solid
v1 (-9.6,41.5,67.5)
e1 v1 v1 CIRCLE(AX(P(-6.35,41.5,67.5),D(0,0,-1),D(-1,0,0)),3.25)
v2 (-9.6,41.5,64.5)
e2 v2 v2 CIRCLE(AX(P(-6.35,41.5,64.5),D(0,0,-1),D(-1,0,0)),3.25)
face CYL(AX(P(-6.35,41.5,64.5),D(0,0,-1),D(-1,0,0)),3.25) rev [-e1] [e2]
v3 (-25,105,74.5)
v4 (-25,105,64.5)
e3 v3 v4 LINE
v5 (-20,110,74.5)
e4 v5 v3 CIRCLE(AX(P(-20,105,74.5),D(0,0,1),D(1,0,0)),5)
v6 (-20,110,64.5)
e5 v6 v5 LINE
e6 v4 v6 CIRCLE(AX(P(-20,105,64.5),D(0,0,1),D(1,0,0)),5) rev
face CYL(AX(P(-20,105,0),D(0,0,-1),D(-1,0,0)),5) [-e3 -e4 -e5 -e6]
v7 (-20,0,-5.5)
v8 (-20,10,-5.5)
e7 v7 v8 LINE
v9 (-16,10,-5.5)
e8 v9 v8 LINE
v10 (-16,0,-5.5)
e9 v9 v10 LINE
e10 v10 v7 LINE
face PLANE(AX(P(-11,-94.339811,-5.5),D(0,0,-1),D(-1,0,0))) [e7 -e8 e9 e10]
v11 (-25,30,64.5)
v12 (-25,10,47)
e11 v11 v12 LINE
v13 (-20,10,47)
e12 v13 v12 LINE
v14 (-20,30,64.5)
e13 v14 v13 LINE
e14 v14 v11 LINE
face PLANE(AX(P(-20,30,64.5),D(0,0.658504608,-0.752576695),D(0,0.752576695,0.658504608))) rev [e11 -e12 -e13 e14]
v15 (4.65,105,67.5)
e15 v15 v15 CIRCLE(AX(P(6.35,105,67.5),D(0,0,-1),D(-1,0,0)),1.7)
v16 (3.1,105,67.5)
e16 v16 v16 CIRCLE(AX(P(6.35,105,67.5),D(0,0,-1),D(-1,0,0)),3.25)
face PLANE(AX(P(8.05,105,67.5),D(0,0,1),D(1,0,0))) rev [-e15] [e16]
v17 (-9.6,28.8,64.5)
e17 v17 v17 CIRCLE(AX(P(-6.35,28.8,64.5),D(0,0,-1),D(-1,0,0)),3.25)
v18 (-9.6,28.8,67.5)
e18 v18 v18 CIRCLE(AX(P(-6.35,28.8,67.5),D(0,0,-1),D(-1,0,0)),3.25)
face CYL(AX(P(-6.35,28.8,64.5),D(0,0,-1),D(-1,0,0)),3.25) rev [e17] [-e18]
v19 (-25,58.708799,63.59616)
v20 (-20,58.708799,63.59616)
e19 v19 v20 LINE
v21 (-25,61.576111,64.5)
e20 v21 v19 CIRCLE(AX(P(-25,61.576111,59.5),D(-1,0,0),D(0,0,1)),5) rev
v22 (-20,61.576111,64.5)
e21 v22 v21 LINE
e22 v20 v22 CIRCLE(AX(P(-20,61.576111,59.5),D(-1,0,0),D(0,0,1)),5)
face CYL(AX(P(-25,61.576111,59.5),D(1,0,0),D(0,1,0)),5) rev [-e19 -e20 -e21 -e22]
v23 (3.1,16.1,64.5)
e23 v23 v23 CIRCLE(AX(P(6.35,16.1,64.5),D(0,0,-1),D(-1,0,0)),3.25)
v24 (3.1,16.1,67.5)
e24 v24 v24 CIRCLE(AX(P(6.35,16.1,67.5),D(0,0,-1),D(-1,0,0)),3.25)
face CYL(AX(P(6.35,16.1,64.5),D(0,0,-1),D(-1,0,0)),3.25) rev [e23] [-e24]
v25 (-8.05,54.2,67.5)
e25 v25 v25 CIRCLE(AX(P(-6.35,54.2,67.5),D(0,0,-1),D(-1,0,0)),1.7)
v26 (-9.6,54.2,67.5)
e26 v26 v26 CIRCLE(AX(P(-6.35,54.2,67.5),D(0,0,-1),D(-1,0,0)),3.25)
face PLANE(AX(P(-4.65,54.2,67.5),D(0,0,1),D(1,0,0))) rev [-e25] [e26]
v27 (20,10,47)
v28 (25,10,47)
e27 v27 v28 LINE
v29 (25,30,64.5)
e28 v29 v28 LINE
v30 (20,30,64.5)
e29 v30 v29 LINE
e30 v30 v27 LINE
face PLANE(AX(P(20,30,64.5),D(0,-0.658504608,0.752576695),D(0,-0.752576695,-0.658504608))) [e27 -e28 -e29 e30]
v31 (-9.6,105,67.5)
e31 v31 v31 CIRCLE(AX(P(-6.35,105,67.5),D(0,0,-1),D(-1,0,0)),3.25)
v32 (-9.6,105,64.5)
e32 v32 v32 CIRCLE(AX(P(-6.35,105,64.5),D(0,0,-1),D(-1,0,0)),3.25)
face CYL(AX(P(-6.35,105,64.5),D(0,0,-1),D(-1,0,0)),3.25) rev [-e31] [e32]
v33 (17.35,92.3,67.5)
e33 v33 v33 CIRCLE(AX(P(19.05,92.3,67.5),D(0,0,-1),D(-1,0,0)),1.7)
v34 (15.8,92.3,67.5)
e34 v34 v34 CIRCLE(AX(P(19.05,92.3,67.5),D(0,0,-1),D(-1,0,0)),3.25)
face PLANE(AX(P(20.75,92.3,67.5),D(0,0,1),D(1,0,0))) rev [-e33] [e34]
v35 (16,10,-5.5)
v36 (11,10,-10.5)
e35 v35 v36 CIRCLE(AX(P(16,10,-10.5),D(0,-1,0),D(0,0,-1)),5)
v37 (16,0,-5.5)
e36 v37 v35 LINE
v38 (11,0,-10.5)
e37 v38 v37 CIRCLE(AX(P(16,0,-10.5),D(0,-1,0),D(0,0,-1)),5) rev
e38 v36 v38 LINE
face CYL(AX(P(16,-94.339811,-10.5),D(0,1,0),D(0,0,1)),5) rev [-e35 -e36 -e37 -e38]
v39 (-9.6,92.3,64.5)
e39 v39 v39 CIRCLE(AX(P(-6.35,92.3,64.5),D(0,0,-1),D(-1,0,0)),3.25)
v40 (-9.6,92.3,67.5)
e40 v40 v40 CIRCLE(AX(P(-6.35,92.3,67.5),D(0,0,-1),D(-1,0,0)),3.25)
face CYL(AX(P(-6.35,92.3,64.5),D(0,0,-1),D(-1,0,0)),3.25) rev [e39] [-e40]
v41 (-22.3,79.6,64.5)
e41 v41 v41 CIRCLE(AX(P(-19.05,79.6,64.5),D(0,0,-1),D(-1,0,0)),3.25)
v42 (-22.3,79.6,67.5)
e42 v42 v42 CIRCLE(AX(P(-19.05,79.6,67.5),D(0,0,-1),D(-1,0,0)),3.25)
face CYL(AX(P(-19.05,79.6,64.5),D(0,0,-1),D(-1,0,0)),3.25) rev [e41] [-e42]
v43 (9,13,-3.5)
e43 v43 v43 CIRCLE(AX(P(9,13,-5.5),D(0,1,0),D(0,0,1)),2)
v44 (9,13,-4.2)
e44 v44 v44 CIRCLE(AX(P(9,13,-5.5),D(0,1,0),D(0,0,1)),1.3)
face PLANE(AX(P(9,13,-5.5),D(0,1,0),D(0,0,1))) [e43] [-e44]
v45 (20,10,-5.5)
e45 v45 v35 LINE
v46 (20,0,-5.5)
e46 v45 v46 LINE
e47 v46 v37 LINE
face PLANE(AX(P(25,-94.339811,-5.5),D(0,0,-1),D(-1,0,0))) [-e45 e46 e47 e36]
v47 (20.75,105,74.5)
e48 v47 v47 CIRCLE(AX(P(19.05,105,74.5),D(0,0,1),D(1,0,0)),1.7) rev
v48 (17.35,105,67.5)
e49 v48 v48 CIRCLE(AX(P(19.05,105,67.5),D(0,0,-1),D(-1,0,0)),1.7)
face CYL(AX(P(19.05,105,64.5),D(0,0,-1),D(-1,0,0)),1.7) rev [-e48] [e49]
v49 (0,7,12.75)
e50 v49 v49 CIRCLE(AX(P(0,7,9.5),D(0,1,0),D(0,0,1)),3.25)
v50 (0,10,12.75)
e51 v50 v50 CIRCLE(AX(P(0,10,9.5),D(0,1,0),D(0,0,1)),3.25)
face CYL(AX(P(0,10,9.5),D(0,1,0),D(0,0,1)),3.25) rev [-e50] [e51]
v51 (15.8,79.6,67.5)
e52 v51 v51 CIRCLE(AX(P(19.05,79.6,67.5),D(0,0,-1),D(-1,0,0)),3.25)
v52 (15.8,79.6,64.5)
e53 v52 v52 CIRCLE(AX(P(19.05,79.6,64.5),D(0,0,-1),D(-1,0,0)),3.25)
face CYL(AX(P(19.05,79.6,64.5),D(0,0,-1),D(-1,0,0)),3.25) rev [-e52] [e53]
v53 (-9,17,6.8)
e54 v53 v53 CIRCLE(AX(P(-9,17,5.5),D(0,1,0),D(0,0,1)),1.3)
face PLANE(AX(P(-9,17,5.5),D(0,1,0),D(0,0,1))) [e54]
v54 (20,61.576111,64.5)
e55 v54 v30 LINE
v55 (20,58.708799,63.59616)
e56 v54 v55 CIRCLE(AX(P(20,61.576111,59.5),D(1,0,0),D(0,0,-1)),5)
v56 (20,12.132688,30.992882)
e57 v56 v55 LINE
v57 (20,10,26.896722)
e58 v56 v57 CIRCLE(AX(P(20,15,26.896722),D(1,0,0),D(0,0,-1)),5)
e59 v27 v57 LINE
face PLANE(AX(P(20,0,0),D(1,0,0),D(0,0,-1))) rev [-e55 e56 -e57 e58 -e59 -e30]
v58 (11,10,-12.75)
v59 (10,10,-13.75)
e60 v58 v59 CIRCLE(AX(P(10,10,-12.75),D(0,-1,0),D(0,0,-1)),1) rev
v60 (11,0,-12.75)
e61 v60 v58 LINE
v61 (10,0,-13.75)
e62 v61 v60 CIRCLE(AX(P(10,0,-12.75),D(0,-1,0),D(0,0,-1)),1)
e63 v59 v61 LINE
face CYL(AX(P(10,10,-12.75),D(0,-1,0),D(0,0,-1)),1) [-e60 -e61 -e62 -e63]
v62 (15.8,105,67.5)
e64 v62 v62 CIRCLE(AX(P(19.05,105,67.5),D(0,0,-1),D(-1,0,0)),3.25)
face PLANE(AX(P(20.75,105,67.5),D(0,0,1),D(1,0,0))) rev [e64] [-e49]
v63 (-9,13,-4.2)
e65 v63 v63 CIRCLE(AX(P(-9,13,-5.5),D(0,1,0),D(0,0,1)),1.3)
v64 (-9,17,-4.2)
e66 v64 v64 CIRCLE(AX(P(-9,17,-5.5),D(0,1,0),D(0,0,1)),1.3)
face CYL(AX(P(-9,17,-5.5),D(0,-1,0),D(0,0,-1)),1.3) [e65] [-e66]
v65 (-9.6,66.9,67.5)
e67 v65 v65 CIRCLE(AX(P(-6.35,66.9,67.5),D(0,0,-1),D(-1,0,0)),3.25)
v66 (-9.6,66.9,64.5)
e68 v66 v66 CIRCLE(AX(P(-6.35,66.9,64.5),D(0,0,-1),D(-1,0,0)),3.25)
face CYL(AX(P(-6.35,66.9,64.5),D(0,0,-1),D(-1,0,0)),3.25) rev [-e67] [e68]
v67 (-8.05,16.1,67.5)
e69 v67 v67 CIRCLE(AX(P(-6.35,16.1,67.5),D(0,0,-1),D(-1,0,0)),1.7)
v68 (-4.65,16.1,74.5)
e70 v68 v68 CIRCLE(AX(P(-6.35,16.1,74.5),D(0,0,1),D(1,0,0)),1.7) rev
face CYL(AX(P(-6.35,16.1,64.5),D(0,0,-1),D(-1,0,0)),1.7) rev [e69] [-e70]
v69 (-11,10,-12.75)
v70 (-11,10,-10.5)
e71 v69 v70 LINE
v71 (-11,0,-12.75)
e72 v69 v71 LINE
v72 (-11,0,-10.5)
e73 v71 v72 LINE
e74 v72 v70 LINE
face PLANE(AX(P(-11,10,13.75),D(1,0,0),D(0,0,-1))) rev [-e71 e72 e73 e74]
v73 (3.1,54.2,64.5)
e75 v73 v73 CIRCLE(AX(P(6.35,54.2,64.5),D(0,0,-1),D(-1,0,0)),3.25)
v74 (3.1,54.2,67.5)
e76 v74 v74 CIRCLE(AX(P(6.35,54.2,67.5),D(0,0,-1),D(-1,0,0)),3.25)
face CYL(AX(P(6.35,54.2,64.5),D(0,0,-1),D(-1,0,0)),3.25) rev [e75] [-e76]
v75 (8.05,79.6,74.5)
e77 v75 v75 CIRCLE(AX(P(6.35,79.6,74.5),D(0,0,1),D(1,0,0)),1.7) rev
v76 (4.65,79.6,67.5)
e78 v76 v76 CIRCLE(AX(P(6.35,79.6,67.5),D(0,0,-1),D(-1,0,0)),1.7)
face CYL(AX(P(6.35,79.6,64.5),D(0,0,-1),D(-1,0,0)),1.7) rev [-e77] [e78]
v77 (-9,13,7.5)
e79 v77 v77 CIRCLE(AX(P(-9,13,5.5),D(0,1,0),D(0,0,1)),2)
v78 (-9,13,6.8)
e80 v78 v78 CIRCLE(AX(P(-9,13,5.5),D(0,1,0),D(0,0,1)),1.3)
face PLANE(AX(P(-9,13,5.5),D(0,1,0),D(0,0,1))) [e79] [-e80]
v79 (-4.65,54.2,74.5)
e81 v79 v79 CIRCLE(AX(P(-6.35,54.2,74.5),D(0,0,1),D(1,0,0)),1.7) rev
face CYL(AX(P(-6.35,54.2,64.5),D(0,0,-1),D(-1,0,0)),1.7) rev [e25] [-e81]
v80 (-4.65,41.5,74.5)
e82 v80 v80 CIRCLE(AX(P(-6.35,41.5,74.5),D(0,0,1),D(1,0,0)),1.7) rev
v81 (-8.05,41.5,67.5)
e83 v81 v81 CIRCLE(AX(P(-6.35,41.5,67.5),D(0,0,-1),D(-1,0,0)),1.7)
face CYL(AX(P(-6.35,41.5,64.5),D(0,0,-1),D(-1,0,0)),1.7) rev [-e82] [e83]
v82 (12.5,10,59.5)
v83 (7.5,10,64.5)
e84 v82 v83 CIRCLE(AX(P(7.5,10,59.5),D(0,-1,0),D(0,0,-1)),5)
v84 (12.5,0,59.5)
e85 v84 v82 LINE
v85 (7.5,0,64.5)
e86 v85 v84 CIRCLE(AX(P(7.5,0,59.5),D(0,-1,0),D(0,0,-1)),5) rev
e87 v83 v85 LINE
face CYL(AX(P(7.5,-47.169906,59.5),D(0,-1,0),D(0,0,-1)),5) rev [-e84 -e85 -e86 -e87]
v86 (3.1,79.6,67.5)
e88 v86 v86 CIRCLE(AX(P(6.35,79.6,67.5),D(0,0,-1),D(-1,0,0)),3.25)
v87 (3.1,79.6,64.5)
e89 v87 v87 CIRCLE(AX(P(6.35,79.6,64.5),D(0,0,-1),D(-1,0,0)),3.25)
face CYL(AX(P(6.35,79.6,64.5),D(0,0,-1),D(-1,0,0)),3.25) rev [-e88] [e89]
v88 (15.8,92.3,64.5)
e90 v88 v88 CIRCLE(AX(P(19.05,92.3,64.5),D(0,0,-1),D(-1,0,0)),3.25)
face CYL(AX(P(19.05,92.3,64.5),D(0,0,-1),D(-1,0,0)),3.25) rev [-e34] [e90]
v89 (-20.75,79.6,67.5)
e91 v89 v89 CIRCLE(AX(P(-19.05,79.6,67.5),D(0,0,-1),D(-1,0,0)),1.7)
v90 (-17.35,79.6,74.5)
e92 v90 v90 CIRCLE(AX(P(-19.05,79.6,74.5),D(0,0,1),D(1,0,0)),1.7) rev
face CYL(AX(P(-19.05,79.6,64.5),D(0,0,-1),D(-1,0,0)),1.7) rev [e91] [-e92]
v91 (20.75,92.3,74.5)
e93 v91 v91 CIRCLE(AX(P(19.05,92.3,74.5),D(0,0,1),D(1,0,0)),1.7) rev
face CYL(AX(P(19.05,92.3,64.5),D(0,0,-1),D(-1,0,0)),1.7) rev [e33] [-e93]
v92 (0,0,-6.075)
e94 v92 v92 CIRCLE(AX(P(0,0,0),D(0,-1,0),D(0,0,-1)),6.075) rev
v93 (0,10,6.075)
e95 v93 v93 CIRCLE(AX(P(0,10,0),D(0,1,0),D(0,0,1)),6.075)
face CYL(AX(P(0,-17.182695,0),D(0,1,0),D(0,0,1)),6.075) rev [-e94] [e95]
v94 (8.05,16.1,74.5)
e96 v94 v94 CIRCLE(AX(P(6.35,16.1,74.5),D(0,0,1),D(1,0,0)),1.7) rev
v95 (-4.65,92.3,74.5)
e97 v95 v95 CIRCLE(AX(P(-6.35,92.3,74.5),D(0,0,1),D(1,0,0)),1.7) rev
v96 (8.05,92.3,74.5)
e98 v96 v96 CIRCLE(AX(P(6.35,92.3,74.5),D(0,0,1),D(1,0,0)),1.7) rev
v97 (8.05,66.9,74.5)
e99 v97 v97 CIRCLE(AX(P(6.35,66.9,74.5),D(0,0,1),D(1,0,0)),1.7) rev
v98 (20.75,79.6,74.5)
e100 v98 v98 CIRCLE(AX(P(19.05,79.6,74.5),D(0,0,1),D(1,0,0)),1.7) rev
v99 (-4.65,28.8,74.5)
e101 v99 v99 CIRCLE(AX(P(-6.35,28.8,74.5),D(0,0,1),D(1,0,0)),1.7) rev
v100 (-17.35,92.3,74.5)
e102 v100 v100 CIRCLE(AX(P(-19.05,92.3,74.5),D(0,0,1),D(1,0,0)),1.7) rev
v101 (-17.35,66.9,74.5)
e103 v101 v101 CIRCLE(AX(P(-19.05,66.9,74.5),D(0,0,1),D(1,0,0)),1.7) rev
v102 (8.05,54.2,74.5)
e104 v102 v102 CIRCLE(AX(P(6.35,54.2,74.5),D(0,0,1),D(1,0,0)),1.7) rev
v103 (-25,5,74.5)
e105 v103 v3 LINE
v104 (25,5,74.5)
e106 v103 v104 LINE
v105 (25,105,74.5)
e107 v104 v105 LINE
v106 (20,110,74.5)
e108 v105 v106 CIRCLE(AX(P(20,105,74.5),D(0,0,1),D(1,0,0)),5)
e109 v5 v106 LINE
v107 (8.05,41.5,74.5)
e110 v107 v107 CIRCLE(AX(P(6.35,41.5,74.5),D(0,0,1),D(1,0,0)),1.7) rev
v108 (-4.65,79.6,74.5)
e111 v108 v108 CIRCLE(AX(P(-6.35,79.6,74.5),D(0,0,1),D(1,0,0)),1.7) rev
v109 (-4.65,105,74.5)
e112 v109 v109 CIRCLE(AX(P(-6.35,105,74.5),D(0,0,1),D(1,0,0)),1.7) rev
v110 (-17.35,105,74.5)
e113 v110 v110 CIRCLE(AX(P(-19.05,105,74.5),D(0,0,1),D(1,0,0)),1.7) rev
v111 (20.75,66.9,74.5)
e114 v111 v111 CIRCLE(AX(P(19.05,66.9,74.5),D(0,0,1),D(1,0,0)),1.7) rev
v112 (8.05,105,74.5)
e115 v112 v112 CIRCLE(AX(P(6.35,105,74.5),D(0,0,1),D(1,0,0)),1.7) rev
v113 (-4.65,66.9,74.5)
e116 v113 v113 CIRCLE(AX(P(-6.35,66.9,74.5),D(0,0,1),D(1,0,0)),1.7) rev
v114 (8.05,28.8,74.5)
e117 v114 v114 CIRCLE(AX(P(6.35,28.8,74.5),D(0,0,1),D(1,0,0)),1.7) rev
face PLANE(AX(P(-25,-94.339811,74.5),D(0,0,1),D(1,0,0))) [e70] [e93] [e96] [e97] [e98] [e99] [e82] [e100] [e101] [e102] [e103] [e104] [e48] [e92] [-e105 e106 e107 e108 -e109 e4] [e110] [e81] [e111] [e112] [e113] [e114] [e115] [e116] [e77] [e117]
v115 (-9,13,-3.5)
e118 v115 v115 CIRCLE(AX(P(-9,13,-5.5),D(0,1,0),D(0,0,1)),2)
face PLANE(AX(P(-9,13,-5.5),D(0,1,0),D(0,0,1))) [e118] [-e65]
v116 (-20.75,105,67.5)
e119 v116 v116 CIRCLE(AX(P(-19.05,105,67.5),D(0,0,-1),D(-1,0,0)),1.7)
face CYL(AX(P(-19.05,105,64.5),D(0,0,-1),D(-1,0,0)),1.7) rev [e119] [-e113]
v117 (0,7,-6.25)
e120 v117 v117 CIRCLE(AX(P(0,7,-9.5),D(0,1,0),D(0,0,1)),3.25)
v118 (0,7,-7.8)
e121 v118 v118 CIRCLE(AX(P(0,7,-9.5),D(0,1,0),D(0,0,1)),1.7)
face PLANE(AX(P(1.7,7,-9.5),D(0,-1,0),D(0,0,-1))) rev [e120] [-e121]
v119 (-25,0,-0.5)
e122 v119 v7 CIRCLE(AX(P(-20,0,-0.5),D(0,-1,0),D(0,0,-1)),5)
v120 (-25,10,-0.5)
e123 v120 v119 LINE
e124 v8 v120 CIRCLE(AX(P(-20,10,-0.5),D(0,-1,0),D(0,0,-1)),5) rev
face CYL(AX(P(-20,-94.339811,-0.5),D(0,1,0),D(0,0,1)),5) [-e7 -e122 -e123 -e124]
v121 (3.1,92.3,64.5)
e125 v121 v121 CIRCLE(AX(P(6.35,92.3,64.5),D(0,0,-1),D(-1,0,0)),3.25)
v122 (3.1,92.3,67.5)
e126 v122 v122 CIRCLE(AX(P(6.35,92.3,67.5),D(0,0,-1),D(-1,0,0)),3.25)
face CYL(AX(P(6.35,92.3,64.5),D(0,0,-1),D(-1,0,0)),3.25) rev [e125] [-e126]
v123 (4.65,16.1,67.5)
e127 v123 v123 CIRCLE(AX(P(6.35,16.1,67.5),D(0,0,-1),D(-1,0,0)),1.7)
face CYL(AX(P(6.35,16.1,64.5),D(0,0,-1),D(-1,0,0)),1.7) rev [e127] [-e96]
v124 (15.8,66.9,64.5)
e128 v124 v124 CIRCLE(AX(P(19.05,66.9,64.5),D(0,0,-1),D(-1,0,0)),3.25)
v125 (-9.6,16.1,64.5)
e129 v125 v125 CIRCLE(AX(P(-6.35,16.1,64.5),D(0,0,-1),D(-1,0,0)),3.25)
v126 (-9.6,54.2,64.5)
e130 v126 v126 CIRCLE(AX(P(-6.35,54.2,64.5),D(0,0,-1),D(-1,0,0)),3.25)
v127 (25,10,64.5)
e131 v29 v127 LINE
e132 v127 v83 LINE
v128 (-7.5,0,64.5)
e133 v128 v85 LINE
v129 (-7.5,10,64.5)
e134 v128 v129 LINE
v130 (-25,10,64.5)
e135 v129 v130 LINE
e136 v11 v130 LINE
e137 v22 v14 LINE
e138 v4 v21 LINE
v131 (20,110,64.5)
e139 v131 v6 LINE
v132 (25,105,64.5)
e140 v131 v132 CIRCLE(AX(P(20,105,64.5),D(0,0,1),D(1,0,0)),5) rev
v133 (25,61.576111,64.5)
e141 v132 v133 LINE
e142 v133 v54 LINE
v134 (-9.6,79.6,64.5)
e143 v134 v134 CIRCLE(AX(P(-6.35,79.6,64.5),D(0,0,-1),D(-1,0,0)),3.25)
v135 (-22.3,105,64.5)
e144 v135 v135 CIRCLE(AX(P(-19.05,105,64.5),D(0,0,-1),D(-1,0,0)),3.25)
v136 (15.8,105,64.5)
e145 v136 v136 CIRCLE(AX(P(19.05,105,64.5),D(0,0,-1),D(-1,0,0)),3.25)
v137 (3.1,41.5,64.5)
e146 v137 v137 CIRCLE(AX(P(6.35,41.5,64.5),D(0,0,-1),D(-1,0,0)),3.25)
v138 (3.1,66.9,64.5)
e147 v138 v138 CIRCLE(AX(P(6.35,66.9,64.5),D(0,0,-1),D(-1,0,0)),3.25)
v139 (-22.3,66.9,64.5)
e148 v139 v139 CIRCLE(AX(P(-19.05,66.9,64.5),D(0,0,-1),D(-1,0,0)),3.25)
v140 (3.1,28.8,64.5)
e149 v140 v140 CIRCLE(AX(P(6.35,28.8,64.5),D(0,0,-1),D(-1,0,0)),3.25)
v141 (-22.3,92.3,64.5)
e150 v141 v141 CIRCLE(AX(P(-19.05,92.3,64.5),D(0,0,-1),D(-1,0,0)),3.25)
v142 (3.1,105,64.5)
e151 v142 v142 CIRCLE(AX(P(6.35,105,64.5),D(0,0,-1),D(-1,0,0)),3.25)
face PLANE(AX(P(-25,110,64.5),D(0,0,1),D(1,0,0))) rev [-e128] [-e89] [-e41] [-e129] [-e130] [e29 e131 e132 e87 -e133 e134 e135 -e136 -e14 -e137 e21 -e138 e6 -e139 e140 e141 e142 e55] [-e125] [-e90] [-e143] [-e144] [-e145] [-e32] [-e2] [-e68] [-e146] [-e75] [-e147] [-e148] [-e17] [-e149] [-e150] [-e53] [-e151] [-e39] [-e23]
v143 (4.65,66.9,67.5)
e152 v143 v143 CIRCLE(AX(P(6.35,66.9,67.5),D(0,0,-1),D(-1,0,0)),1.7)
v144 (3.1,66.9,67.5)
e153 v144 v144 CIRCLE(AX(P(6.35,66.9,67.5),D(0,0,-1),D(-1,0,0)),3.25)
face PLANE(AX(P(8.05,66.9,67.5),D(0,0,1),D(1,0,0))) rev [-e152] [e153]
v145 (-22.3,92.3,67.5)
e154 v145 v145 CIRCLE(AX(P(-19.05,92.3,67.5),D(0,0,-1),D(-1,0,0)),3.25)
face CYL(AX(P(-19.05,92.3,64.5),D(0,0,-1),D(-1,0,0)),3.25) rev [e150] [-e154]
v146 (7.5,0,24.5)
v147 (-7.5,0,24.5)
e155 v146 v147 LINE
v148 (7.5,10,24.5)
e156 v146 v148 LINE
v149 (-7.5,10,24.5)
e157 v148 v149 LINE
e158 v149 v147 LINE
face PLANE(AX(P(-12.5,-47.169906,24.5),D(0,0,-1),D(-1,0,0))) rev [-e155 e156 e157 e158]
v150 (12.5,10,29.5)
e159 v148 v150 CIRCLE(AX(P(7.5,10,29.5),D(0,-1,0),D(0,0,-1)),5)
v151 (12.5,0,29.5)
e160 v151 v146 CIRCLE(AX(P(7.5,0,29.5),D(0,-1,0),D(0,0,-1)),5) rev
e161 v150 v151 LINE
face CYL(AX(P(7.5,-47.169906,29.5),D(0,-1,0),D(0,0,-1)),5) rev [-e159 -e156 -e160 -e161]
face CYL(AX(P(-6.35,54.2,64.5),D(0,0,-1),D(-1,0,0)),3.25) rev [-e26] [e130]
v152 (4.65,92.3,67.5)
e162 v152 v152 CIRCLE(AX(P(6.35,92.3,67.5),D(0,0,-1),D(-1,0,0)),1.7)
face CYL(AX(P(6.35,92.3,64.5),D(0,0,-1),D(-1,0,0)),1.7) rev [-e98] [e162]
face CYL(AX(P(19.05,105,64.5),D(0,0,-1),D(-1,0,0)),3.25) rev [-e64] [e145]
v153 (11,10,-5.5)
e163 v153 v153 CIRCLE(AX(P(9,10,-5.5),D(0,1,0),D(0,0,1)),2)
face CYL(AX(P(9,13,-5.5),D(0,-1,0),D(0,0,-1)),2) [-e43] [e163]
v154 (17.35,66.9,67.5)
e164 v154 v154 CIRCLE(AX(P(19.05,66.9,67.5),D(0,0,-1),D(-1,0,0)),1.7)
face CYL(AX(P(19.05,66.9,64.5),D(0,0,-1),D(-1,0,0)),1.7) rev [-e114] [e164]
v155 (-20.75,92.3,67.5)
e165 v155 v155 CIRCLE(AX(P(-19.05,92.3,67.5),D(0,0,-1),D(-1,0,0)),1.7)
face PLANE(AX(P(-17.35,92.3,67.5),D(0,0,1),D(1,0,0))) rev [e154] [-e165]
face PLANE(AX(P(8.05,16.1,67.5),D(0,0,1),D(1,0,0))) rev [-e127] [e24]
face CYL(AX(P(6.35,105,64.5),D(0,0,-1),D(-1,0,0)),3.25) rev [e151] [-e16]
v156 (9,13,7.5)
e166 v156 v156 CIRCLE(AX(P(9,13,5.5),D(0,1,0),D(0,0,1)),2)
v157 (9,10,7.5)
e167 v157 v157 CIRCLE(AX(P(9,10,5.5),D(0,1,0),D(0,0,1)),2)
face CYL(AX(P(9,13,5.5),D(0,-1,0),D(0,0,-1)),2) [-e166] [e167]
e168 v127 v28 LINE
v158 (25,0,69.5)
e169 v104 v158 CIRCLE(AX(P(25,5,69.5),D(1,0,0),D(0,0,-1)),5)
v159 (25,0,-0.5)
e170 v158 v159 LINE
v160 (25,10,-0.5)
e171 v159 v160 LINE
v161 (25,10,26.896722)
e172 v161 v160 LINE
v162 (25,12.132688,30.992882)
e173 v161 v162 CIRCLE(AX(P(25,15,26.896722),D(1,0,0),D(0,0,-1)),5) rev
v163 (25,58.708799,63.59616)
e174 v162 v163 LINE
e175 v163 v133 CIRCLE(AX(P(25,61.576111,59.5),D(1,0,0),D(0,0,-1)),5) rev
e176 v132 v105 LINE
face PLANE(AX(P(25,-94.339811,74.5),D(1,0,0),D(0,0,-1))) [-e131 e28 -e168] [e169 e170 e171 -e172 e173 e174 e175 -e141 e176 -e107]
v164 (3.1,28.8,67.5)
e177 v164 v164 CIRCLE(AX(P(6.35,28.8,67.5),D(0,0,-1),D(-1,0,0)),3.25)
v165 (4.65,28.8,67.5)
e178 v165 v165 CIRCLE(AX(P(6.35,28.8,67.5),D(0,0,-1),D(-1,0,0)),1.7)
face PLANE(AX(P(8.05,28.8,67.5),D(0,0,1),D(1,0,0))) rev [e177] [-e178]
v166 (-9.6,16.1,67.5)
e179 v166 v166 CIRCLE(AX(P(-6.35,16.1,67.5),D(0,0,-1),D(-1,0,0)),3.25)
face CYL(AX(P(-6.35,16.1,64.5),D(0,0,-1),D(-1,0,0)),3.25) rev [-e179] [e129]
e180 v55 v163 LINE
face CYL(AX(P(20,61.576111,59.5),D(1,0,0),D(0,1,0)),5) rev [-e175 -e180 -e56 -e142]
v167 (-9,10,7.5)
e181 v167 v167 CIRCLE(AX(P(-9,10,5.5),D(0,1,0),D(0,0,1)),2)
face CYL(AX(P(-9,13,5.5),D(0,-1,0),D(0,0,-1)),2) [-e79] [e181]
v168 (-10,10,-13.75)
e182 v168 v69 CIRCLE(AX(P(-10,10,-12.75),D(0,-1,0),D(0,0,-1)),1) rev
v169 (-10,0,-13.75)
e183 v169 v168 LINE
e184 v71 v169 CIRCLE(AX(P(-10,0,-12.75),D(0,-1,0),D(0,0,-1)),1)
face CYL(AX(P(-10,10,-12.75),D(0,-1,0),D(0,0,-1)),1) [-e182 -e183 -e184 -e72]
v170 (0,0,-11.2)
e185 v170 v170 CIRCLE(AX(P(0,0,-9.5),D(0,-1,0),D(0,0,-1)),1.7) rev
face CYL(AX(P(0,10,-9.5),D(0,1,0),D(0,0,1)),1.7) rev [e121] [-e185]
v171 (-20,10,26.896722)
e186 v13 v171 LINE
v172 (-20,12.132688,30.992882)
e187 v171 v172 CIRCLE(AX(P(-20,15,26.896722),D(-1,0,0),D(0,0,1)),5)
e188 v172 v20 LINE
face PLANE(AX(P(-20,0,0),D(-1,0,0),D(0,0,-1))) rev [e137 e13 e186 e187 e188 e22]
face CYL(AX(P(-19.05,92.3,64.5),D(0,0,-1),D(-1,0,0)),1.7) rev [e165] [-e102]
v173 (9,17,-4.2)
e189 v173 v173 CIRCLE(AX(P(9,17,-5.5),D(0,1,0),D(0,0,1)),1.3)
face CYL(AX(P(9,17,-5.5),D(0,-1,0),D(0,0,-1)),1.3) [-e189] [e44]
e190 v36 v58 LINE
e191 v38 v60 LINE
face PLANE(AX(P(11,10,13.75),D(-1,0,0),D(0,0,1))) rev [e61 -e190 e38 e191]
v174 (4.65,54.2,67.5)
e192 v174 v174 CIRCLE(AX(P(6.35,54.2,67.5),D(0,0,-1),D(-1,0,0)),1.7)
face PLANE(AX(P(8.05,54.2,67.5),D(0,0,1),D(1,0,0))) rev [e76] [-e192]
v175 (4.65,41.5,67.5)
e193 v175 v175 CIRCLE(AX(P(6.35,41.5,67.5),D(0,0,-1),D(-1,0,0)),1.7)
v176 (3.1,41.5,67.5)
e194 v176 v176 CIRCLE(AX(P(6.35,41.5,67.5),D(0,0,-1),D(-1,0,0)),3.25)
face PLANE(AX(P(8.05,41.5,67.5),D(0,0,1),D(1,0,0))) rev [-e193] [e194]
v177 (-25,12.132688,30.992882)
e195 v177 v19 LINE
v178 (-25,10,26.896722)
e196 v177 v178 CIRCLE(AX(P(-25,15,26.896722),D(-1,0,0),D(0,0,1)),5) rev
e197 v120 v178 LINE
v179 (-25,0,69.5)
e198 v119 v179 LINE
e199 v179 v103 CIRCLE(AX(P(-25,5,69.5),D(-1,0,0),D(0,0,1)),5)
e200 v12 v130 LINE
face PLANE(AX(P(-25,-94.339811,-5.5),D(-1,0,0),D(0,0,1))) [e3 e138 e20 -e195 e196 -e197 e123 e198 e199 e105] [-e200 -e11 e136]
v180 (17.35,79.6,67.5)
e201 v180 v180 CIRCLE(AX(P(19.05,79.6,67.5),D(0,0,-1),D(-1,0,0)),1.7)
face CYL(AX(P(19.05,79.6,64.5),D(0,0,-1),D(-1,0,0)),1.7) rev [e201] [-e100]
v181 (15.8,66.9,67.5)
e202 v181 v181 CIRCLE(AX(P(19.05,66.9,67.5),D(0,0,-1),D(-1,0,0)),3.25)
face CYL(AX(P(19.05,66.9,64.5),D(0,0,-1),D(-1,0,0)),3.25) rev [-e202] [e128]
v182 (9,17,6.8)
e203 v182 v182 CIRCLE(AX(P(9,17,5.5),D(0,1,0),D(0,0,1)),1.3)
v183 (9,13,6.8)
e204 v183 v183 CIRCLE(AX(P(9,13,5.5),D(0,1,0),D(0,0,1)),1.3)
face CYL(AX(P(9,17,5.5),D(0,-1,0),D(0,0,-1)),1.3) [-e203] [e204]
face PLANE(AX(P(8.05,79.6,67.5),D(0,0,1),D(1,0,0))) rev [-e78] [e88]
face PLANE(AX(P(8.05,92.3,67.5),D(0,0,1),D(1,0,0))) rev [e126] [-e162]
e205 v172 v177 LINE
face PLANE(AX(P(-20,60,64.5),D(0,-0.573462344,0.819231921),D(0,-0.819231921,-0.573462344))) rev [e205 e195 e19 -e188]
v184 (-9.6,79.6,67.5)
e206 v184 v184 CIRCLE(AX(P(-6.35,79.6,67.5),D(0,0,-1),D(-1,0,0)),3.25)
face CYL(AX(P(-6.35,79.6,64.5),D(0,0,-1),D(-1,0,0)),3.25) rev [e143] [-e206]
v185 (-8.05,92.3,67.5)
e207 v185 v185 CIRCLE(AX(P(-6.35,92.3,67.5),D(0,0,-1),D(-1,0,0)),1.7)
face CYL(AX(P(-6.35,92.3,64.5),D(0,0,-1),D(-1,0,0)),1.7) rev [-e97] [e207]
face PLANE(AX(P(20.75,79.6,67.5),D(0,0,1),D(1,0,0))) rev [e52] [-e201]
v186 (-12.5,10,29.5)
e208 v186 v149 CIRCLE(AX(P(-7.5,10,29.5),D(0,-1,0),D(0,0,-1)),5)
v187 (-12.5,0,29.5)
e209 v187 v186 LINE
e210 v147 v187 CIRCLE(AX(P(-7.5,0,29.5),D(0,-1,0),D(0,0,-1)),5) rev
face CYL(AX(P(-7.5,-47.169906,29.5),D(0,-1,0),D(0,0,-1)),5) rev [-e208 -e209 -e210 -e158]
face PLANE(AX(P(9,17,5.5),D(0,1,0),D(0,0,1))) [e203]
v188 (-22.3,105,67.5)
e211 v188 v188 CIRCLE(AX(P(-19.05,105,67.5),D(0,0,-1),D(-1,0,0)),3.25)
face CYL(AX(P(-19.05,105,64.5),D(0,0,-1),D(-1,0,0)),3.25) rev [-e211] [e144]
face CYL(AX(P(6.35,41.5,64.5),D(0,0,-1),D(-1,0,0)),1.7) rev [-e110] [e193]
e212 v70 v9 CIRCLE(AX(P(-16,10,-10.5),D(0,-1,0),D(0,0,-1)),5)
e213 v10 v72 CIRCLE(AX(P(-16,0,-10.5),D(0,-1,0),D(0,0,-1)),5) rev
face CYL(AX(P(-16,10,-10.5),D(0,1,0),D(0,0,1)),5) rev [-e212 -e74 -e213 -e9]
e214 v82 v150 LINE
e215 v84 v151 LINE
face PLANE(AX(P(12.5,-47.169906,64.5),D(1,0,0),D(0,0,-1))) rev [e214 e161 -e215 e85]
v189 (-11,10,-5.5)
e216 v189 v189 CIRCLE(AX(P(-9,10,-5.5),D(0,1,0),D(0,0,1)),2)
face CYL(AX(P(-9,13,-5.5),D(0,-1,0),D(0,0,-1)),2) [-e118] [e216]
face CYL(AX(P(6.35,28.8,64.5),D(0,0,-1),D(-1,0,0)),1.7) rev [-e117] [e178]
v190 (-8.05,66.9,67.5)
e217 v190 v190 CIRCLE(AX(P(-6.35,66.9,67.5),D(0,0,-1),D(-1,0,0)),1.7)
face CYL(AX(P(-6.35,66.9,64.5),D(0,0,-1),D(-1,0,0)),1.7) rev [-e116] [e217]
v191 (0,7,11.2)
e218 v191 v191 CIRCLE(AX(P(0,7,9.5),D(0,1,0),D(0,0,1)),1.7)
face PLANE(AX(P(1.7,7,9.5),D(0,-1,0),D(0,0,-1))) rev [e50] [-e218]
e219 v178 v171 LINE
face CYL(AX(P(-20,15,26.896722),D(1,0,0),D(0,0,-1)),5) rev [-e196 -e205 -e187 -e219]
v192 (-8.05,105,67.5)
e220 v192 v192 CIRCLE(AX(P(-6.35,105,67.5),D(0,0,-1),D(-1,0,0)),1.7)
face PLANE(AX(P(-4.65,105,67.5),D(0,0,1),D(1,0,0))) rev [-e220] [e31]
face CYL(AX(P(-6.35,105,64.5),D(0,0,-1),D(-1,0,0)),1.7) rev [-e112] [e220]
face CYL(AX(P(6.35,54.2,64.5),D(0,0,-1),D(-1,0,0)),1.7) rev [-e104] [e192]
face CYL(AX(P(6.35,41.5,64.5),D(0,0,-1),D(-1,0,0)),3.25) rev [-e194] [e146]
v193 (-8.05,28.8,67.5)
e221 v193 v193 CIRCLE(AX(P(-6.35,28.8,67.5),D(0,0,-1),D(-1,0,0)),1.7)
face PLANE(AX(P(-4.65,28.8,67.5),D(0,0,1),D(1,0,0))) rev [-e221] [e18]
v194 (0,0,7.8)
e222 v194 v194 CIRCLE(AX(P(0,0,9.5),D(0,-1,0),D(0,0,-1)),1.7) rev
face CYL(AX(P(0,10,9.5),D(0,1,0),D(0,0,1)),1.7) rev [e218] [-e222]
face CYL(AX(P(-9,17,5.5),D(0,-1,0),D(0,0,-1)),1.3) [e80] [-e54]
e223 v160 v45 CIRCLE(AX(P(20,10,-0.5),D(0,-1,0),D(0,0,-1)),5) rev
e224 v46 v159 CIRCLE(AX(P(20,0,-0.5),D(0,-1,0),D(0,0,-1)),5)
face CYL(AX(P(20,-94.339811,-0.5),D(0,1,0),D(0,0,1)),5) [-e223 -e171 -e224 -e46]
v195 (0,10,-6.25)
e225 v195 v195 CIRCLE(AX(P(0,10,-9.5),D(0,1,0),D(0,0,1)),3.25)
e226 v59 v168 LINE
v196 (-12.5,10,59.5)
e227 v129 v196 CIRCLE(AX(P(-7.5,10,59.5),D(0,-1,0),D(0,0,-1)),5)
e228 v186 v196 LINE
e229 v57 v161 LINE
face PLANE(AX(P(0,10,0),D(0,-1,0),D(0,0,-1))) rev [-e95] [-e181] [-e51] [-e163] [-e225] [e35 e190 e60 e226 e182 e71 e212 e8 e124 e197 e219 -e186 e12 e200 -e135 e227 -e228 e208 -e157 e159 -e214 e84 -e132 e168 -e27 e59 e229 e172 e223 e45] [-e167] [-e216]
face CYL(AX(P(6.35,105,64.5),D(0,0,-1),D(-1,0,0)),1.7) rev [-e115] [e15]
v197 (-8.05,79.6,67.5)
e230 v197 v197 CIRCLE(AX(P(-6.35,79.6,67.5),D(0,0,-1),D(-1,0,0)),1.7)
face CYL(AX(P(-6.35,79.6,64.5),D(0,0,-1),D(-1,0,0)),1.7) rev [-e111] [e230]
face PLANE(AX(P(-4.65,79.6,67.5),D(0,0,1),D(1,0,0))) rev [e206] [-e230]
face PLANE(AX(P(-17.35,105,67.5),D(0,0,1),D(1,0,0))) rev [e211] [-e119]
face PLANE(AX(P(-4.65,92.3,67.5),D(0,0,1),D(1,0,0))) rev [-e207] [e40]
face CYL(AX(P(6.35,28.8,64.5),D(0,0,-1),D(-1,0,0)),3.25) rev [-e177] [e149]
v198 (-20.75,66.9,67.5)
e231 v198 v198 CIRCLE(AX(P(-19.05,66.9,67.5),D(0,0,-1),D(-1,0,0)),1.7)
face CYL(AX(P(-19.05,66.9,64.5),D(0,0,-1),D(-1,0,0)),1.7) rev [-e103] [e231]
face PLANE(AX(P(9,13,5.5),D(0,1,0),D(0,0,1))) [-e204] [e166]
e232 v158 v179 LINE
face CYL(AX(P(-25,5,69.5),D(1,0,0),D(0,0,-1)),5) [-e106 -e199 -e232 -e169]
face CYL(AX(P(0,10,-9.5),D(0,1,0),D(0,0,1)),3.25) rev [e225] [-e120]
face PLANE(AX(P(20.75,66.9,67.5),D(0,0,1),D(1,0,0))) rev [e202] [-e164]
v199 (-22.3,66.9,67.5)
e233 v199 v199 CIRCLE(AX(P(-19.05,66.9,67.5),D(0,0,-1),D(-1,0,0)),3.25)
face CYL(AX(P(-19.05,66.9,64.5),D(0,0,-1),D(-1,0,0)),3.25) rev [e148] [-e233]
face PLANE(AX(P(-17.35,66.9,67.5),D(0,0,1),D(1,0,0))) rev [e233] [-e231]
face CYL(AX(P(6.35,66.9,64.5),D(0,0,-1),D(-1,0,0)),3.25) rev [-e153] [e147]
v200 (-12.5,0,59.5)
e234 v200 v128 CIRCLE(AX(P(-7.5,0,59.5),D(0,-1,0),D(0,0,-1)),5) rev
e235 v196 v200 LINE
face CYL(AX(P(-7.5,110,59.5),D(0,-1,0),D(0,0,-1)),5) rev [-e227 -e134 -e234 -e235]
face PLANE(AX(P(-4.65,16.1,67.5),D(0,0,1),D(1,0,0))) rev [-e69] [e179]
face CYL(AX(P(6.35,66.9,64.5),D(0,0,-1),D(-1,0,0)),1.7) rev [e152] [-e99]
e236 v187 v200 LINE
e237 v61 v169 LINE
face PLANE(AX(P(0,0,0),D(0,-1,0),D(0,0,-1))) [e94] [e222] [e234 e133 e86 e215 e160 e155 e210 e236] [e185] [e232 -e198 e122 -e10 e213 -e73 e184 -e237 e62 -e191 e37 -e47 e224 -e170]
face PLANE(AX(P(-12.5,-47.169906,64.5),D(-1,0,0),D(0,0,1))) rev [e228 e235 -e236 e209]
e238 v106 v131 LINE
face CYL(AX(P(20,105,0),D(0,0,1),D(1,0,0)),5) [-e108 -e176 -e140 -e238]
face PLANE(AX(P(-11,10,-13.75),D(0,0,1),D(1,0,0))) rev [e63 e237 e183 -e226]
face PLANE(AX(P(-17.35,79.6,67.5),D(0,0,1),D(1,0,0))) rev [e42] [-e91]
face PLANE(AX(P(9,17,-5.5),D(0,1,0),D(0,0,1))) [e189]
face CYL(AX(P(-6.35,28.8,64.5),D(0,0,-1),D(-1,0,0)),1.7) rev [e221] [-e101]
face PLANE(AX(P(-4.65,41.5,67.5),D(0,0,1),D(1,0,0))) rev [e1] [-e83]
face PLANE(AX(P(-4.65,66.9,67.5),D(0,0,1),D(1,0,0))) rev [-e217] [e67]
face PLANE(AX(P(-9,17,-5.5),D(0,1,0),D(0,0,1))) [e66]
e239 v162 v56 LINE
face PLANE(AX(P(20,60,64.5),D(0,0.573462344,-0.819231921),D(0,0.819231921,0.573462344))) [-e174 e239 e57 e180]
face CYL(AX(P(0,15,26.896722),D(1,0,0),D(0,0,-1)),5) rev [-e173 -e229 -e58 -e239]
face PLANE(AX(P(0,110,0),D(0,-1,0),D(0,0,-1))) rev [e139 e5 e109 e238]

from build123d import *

# Parameters (mm, degrees)
SKETCH2_W                      = 22
SKETCH2_H                      = 27.5
BOSS_EXTRUDE1_DEPTH            = 10
SKETCH3_R                      = 1.3
BOSS_EXTRUDE2_DEPTH            = 7
SKETCH4_R                      = 6.075
CUT_EXTRUDE1_DEPTH             = 10
FILLET1_R                      = 1
CBORE_FOR_M3_SHCS1_D           = 3.4
CBORE_FOR_M3_SHCS1_DEPTH       = 10
CBORE_FOR_M3_SHCS1_CBORE_D     = 6.5
CBORE_FOR_M3_SHCS1_CBORE_DEPTH = 3
CBORE_FOR_M3_SHCS1_TIP         = 1.021463052
SKETCH8_R                      = 2
SKETCH8_R_2                    = 1.3
BOSS_EXTRUDE3_DEPTH            = 3
BOSS_EXTRUDE4_DEPTH            = 10
SKETCH10_W                     = 50
SKETCH10_H                     = 10
BOSS_EXTRUDE5_DEPTH            = 100
BOSS_EXTRUDE6_DEPTH            = 5
SKETCH12_W                     = 25
SKETCH12_H                     = 40
CUT_EXTRUDE2_DEPTH             = 10
FILLET2_START                  = -25
FILLET2_DEPTH                  = 5
FILLET2_START_2                = 20
FILLET2_2_DEPTH                = 5
FILLET2_3_DEPTH                = 10
FILLET2_4_DEPTH                = 50
FILLET2_START_3                = 24.5
FILLET2_5_DEPTH                = 50.5
FILLET2_START_4                = -1
FILLET2_6_DEPTH                = 11
CBORE_FOR_M3_SHCS2_AT_2_COUNT  = 2
CBORE_FOR_M3_SHCS2_AT_2_PITCH  = 12.7
CBORE_FOR_M3_SHCS2_AT_3_COUNT  = 2
CBORE_FOR_M3_SHCS2_AT_3_PITCH  = 25.4
CBORE_FOR_M3_SHCS2_AT_4_COUNT  = 2
CBORE_FOR_M3_SHCS2_AT_4_PITCH  = 38.1
LPATTERN1_COUNT                = 4
LPATTERN1_PITCH                = 12.7
CBORE_FOR_M3_SHCS3_AT_2_COUNT  = 2
CBORE_FOR_M3_SHCS3_AT_2_PITCH  = 12.7
LPATTERN2_COUNT                = 4
LPATTERN2_PITCH                = 12.7


with BuildPart() as part:
    # Sketch2 → Boss-Extrude1 (new body)
    with BuildSketch(Plane(origin=(0, 0, 0), x_dir=(1, 0, 0), z_dir=(0, 1, 0))):
        Rectangle(SKETCH2_W, SKETCH2_H)
    extrude(amount=BOSS_EXTRUDE1_DEPTH)

    # Sketch3 → Boss-Extrude2 (add)
    with BuildSketch(Plane(origin=(0, 10, 0), x_dir=(1, 0, 0), z_dir=(0, 1, 0))):
        with Locations(Location((-9, 5.5, 0), (0, 0, 90))):
            Circle(SKETCH3_R)
        with Locations(Location((9, 5.5, 0), (0, 0, 90))):
            Circle(SKETCH3_R)
        with Locations(Location((9, -5.5, 0), (0, 0, 90))):
            Circle(SKETCH3_R)
        with Locations(Location((-9, -5.5, 0), (0, 0, 90))):
            Circle(SKETCH3_R)
    extrude(amount=BOSS_EXTRUDE2_DEPTH)

    # Sketch4 → Cut-Extrude1 (cut)
    with BuildSketch(Plane(origin=(0, 10, 0), x_dir=(1, 0, 0), z_dir=(0, 1, 0))):
        with Locations(Location((0, 0, 0), (0, 0, 270))):
            Circle(SKETCH4_R)
    extrude(amount=-CUT_EXTRUDE1_DEPTH, mode=Mode.SUBTRACT)

    # Fillet1
    fillet1_edges = [part.edges().sort_by_distance(p)[0] for p in [
        (11, 5, 13.75),
        (-11, 5, 13.75),
        (-11, 5, -13.75),
        (11, 5, -13.75),
    ]]
    fillet(fillet1_edges, radius=FILLET1_R)

    # CBORE for M3 SHCS1
    with Locations(Plane(origin=(0, 10, 0), x_dir=(1, 0, 0), z_dir=(0, 1, 0))):
        with Locations((0, 9.5), (0, -9.5)):
            CounterBoreHole(CBORE_FOR_M3_SHCS1_D / 2, CBORE_FOR_M3_SHCS1_CBORE_D / 2, CBORE_FOR_M3_SHCS1_CBORE_DEPTH, depth=CBORE_FOR_M3_SHCS1_DEPTH)
            with Locations((0, 0, -(CBORE_FOR_M3_SHCS1_DEPTH + CBORE_FOR_M3_SHCS1_TIP / 2))):  # 118° drill point
                Cone(0, CBORE_FOR_M3_SHCS1_D / 2, CBORE_FOR_M3_SHCS1_TIP, mode=Mode.SUBTRACT)

    # Sketch8 → Boss-Extrude3 (add)
    # profile 1 of 4: a face of its own
    with BuildSketch(Plane(origin=(0, 10, 0), x_dir=(1, 0, 0), z_dir=(0, 1, 0))):
        with Locations(Location((-9, 5.5, 0), (0, 0, 180))):
            Circle(SKETCH8_R)
        with Locations(Location((-9, 5.5, 0), (0, 0, 270))):
            Circle(SKETCH8_R_2, mode=Mode.SUBTRACT)
    # profile 2 of 4: a face of its own
    with BuildSketch(Plane(origin=(0, 10, 0), x_dir=(1, 0, 0), z_dir=(0, 1, 0))):
        with Locations((9, 5.5)):
            Circle(SKETCH8_R)
        with Locations(Location((9, 5.5, 0), (0, 0, 270))):
            Circle(SKETCH8_R_2, mode=Mode.SUBTRACT)
    # profile 3 of 4: a face of its own
    with BuildSketch(Plane(origin=(0, 10, 0), x_dir=(1, 0, 0), z_dir=(0, 1, 0))):
        with Locations((9, -5.5)):
            Circle(SKETCH8_R)
        with Locations(Location((9, -5.5, 0), (0, 0, 270))):
            Circle(SKETCH8_R_2, mode=Mode.SUBTRACT)
    # profile 4 of 4: a face of its own
    with BuildSketch(Plane(origin=(0, 10, 0), x_dir=(1, 0, 0), z_dir=(0, 1, 0))):
        with Locations(Location((-9, -5.5, 0), (0, 0, 180))):
            Circle(SKETCH8_R)
        with Locations(Location((-9, -5.5, 0), (0, 0, 270))):
            Circle(SKETCH8_R_2, mode=Mode.SUBTRACT)
    extrude(amount=BOSS_EXTRUDE3_DEPTH)

    # Sketch9 → Boss-Extrude4 (add)
    with BuildSketch(Plane(origin=(0, 10, 0), x_dir=(1, 0, 0), z_dir=(0, 1, 0))):
        with BuildLine():
            Line((11, -5.5), (11, 5.5))
            Line((11, 5.5), (25, 5.5))
            Line((25, 5.5), (25, -74.5))
            Line((25, -74.5), (-25, -74.5))
            Line((-25, -74.5), (-25, 5.5))
            Line((-25, 5.5), (-11, 5.5))
            Line((-11, 5.5), (-11, -5.5))
            Line((-11, -5.5), (-11, -12.75))
            ThreePointArc((-11, -12.75), (-10.707106781, -13.457106781), (-10, -13.75))
            Line((-10, -13.75), (10, -13.75))
            ThreePointArc((10, -13.75), (10.707106781, -13.457106781), (11, -12.75))
            Line((11, -12.75), (11, -5.5))
        make_face()
    extrude(amount=-BOSS_EXTRUDE4_DEPTH)

    # Sketch10 → Boss-Extrude5 (add)
    with BuildSketch(Plane(origin=(0, 10, 0), x_dir=(1, 0, 0), z_dir=(0, 1, 0))):
        with Locations((0, -69.5)):
            Rectangle(SKETCH10_W, SKETCH10_H)
    extrude(amount=BOSS_EXTRUDE5_DEPTH)

    # Sketch11 → Boss-Extrude6 (add)
    with BuildSketch(Plane(origin=(25, 0, 0), x_dir=(0, 0, -1), z_dir=(1, 0, 0))):
        Polygon((-64.5, 60), (-29.5, 10), (-47, 10), (-64.5, 30), align=None)
    boss_extrude6 = extrude(amount=-BOSS_EXTRUDE6_DEPTH)

    # Mirror1: Boss-Extrude6 across plane
    add(boss_extrude6.mirror(Plane(origin=(0, 0, 0), x_dir=(0, 0, 1), z_dir=(1, 0, 0))))

    # Sketch12 → Cut-Extrude2 (cut)
    with BuildSketch(Plane(origin=(0, 10, 0), x_dir=(1, 0, 0), z_dir=(0, 1, 0))):
        with Locations((0, -44.5)):
            Rectangle(SKETCH12_W, SKETCH12_H)
    extrude(amount=-CUT_EXTRUDE2_DEPTH, mode=Mode.SUBTRACT)

    # Fillet2: read off the stored shape, not the designer's step
    # Fillet2 outline → Fillet2 (add)
    with BuildSketch(Plane.YZ.offset(FILLET2_START)):
        with BuildLine():
            ThreePointArc((58.708799432, 63.596159603), (60.07291423, 64.268689443), (61.576111154, 64.5))
            Line((61.576111154, 64.5), (60, 64.5))
            Line((60, 64.5), (58.708799432, 63.596159603))
        make_face()
        with BuildLine():
            ThreePointArc((10, 26.896722192), (10.565106619, 29.205774096), (12.132688278, 30.992881795))
            Line((12.132688278, 30.992881795), (10, 29.5))
            Line((10, 29.5), (10, 26.896722192))
        make_face()
    extrude(amount=FILLET2_DEPTH)

    # Fillet2 2 outline → Fillet2 2 (add)
    with BuildSketch(Plane.YZ.offset(FILLET2_START_2)):
        with BuildLine():
            ThreePointArc((58.708799432, 63.596159603), (60.07291423, 64.268689443), (61.576111154, 64.5))
            Line((61.576111154, 64.5), (60, 64.5))
            Line((60, 64.5), (58.708799432, 63.596159603))
        make_face()
        with BuildLine():
            ThreePointArc((10, 26.896722192), (10.565106619, 29.205774096), (12.132688278, 30.992881795))
            Line((12.132688278, 30.992881795), (10, 29.5))
            Line((10, 29.5), (10, 26.896722192))
        make_face()
    extrude(amount=FILLET2_2_DEPTH)

    # Fillet2 3 outline → Fillet2 3 (add)
    with BuildSketch(Plane(origin=(0, 0, 0), x_dir=(1, 0, 0), z_dir=(0, 1, 0))):
        with BuildLine():
            Line((11, 5.5), (16, 5.5))
            ThreePointArc((16, 5.5), (12.464466094, 6.964466094), (11, 10.5))
            Line((11, 10.5), (11, 5.5))
        make_face()
        with BuildLine():
            ThreePointArc((-11, 10.5), (-12.464466094, 6.964466094), (-16, 5.5))
            Line((-16, 5.5), (-11, 5.5))
            Line((-11, 5.5), (-11, 10.5))
        make_face()
        with BuildLine():
            Line((-12.5, -59.5), (-12.5, -64.5))
            Line((-12.5, -64.5), (-7.5, -64.5))
            ThreePointArc((-7.5, -64.5), (-11.035533906, -63.035533906), (-12.5, -59.5))
        make_face()
        with BuildLine():
            Line((-12.5, -24.5), (-12.5, -29.5))
            ThreePointArc((-12.5, -29.5), (-11.035533906, -25.964466094), (-7.5, -24.5))
            Line((-7.5, -24.5), (-12.5, -24.5))
        make_face()
        with BuildLine():
            ThreePointArc((12.5, -59.5), (11.035533906, -63.035533906), (7.5, -64.5))
            Line((7.5, -64.5), (12.5, -64.5))
            Line((12.5, -64.5), (12.5, -59.5))
        make_face()
        with BuildLine():
            Line((12.5, -24.5), (7.5, -24.5))
            ThreePointArc((7.5, -24.5), (11.035533906, -25.964466094), (12.5, -29.5))
            Line((12.5, -29.5), (12.5, -24.5))
        make_face()
    extrude(amount=FILLET2_3_DEPTH)

    # Fillet2 4 outline → Fillet2 4 (cut)
    with BuildSketch(Plane.YZ.offset(FILLET2_START)):
        with BuildLine():
            ThreePointArc((0, 69.5), (1.464466094, 73.035533906), (5, 74.5))
            Line((5, 74.5), (0, 74.5))
            Line((0, 74.5), (0, 69.5))
        make_face()
    extrude(amount=FILLET2_4_DEPTH, mode=Mode.SUBTRACT)

    # Fillet2 5 outline → Fillet2 5 (cut)
    with BuildSketch(Plane.XY.offset(FILLET2_START_3)):
        with BuildLine():
            Line((-25, 110), (-25, 105))
            ThreePointArc((-25, 105), (-23.535533906, 108.535533906), (-20, 110))
            Line((-20, 110), (-25, 110))
        make_face()
        with BuildLine():
            Line((25, 110), (20, 110))
            ThreePointArc((20, 110), (23.535533906, 108.535533906), (25, 105))
            Line((25, 105), (25, 110))
        make_face()
    extrude(amount=FILLET2_5_DEPTH, mode=Mode.SUBTRACT)

    # Fillet2 6 outline → Fillet2 6 (cut)
    with BuildSketch(Plane(origin=(0, 0, 0), x_dir=(1, 0, 0), z_dir=(0, 1, 0)).offset(FILLET2_START_4)):
        with BuildLine():
            ThreePointArc((20, 5.5), (23.535533906, 4.035533906), (25, 0.5))
            Line((25, 0.5), (25, 5.5))
            Line((25, 5.5), (20, 5.5))
        make_face()
        with BuildLine():
            ThreePointArc((-25, 0.5), (-23.535533906, 4.035533906), (-20, 5.5))
            Line((-20, 5.5), (-25, 5.5))
            Line((-25, 5.5), (-25, 0.5))
        make_face()
    extrude(amount=FILLET2_6_DEPTH, mode=Mode.SUBTRACT)

    # Sketch14 → CBORE for M3 SHCS2 (revolve, cut)
    with BuildSketch(Plane(origin=(19.05, 105, 64.5), x_dir=(0, 1, 0), z_dir=(1, 0, 0))):
        Polygon((0, 0), (0, 11.021463052), (1.7, 10), (1.7, 3), (3.25, 3), (3.25, 0), align=None)
    cbore_for_m3_shcs2 = revolve(axis=Axis((19.05, 105, 58.15), (0, 0, 1)), mode=Mode.SUBTRACT)

    # CBORE for M3 SHCS2 at 2: CBORE for M3 SHCS2 ×2
    with Locations(*[(-i * CBORE_FOR_M3_SHCS2_AT_2_PITCH, 0, 0) for i in range(1, CBORE_FOR_M3_SHCS2_AT_2_COUNT)]):
        add(cbore_for_m3_shcs2, mode=Mode.SUBTRACT)

    # CBORE for M3 SHCS2 at 3: CBORE for M3 SHCS2 ×2
    with Locations(*[(-i * CBORE_FOR_M3_SHCS2_AT_3_PITCH, 0, 0) for i in range(1, CBORE_FOR_M3_SHCS2_AT_3_COUNT)]):
        add(cbore_for_m3_shcs2, mode=Mode.SUBTRACT)

    # CBORE for M3 SHCS2 at 4: CBORE for M3 SHCS2 ×2
    with Locations(*[(-i * CBORE_FOR_M3_SHCS2_AT_4_PITCH, 0, 0) for i in range(1, CBORE_FOR_M3_SHCS2_AT_4_COUNT)]):
        add(cbore_for_m3_shcs2, mode=Mode.SUBTRACT)

    # LPattern1: CBORE for M3 SHCS2 ×4
    with Locations(*[(0, -i * LPATTERN1_PITCH, 0) for i in range(1, LPATTERN1_COUNT)]):
        add(cbore_for_m3_shcs2, mode=Mode.SUBTRACT)

    # LPattern1 copy 1 sketch → LPattern1 copy 1 (revolve, cut)
    with BuildSketch(Plane(origin=(6.35, 92.3, 64.5), x_dir=(0, 1, 0), z_dir=(1, 0, 0))):
        Polygon((0, 0), (0, 11.021463052), (1.7, 10), (1.7, 3), (3.25, 3), (3.25, 0), align=None)
    revolve(axis=Axis((6.35, 92.3, 58.15), (0, 0, 1)), mode=Mode.SUBTRACT)

    # LPattern1 copy 2 sketch → LPattern1 copy 2 (revolve, cut)
    with BuildSketch(Plane(origin=(6.35, 79.6, 64.5), x_dir=(0, 1, 0), z_dir=(1, 0, 0))):
        Polygon((0, 0), (0, 11.021463052), (1.7, 10), (1.7, 3), (3.25, 3), (3.25, 0), align=None)
    revolve(axis=Axis((6.35, 79.6, 58.15), (0, 0, 1)), mode=Mode.SUBTRACT)

    # LPattern1 copy 3 sketch → LPattern1 copy 3 (revolve, cut)
    with BuildSketch(Plane(origin=(6.35, 66.9, 64.5), x_dir=(0, 1, 0), z_dir=(1, 0, 0))):
        Polygon((0, 0), (0, 11.021463052), (1.7, 10), (1.7, 3), (3.25, 3), (3.25, 0), align=None)
    revolve(axis=Axis((6.35, 66.9, 58.15), (0, 0, 1)), mode=Mode.SUBTRACT)

    # LPattern1 copy 4 sketch → LPattern1 copy 4 (revolve, cut)
    with BuildSketch(Plane(origin=(-6.35, 92.3, 64.5), x_dir=(0, 1, 0), z_dir=(1, 0, 0))):
        Polygon((0, 0), (0, 11.021463052), (1.7, 10), (1.7, 3), (3.25, 3), (3.25, 0), align=None)
    revolve(axis=Axis((-6.35, 92.3, 58.15), (0, 0, 1)), mode=Mode.SUBTRACT)

    # LPattern1 copy 5 sketch → LPattern1 copy 5 (revolve, cut)
    with BuildSketch(Plane(origin=(-6.35, 79.6, 64.5), x_dir=(0, 1, 0), z_dir=(1, 0, 0))):
        Polygon((0, 0), (0, 11.021463052), (1.7, 10), (1.7, 3), (3.25, 3), (3.25, 0), align=None)
    revolve(axis=Axis((-6.35, 79.6, 58.15), (0, 0, 1)), mode=Mode.SUBTRACT)

    # LPattern1 copy 6 sketch → LPattern1 copy 6 (revolve, cut)
    with BuildSketch(Plane(origin=(-6.35, 66.9, 64.5), x_dir=(0, 1, 0), z_dir=(1, 0, 0))):
        Polygon((0, 0), (0, 11.021463052), (1.7, 10), (1.7, 3), (3.25, 3), (3.25, 0), align=None)
    revolve(axis=Axis((-6.35, 66.9, 58.15), (0, 0, 1)), mode=Mode.SUBTRACT)

    # LPattern1 copy 7 sketch → LPattern1 copy 7 (revolve, cut)
    with BuildSketch(Plane(origin=(-19.05, 92.3, 64.5), x_dir=(0, 1, 0), z_dir=(1, 0, 0))):
        Polygon((0, 0), (0, 11.021463052), (1.7, 10), (1.7, 3), (3.25, 3), (3.25, 0), align=None)
    revolve(axis=Axis((-19.05, 92.3, 58.15), (0, 0, 1)), mode=Mode.SUBTRACT)

    # LPattern1 copy 8 sketch → LPattern1 copy 8 (revolve, cut)
    with BuildSketch(Plane(origin=(-19.05, 79.6, 64.5), x_dir=(0, 1, 0), z_dir=(1, 0, 0))):
        Polygon((0, 0), (0, 11.021463052), (1.7, 10), (1.7, 3), (3.25, 3), (3.25, 0), align=None)
    revolve(axis=Axis((-19.05, 79.6, 58.15), (0, 0, 1)), mode=Mode.SUBTRACT)

    # LPattern1 copy 9 sketch → LPattern1 copy 9 (revolve, cut)
    with BuildSketch(Plane(origin=(-19.05, 66.9, 64.5), x_dir=(0, 1, 0), z_dir=(1, 0, 0))):
        Polygon((0, 0), (0, 11.021463052), (1.7, 10), (1.7, 3), (3.25, 3), (3.25, 0), align=None)
    revolve(axis=Axis((-19.05, 66.9, 58.15), (0, 0, 1)), mode=Mode.SUBTRACT)

    # Sketch17 → CBORE for M3 SHCS3 (revolve, cut)
    with BuildSketch(Plane(origin=(6.35, 54.2, 64.5), x_dir=(0, 1, 0), z_dir=(1, 0, 0))):
        Polygon((0, 0), (0, 11.021463052), (1.7, 10), (1.7, 3), (3.25, 3), (3.25, 0), align=None)
    cbore_for_m3_shcs3 = revolve(axis=Axis((6.35, 54.2, 58.15), (0, 0, 1)), mode=Mode.SUBTRACT)

    # CBORE for M3 SHCS3 at 2: CBORE for M3 SHCS3 ×2
    with Locations(*[(-i * CBORE_FOR_M3_SHCS3_AT_2_PITCH, 0, 0) for i in range(1, CBORE_FOR_M3_SHCS3_AT_2_COUNT)]):
        add(cbore_for_m3_shcs3, mode=Mode.SUBTRACT)

    # LPattern2: CBORE for M3 SHCS3 ×4
    with Locations(*[(0, -i * LPATTERN2_PITCH, 0) for i in range(1, LPATTERN2_COUNT)]):
        add(cbore_for_m3_shcs3, mode=Mode.SUBTRACT)

    # LPattern2 copy 1 sketch → LPattern2 copy 1 (revolve, cut)
    with BuildSketch(Plane(origin=(-6.35, 41.5, 64.5), x_dir=(0, 1, 0), z_dir=(1, 0, 0))):
        Polygon((0, 0), (0, 11.021463052), (1.7, 10), (1.7, 3), (3.25, 3), (3.25, 0), align=None)
    revolve(axis=Axis((-6.35, 41.5, 58.15), (0, 0, 1)), mode=Mode.SUBTRACT)

    # LPattern2 copy 2 sketch → LPattern2 copy 2 (revolve, cut)
    with BuildSketch(Plane(origin=(-6.35, 28.8, 64.5), x_dir=(0, 1, 0), z_dir=(1, 0, 0))):
        Polygon((0, 0), (0, 11.021463052), (1.7, 10), (1.7, 3), (3.25, 3), (3.25, 0), align=None)
    revolve(axis=Axis((-6.35, 28.8, 58.15), (0, 0, 1)), mode=Mode.SUBTRACT)

    # LPattern2 copy 3 sketch → LPattern2 copy 3 (revolve, cut)
    with BuildSketch(Plane(origin=(-6.35, 16.1, 64.5), x_dir=(0, 1, 0), z_dir=(1, 0, 0))):
        Polygon((0, 0), (0, 11.021463052), (1.7, 10), (1.7, 3), (3.25, 3), (3.25, 0), align=None)
    revolve(axis=Axis((-6.35, 16.1, 58.15), (0, 0, 1)), mode=Mode.SUBTRACT)


solid = part.part
